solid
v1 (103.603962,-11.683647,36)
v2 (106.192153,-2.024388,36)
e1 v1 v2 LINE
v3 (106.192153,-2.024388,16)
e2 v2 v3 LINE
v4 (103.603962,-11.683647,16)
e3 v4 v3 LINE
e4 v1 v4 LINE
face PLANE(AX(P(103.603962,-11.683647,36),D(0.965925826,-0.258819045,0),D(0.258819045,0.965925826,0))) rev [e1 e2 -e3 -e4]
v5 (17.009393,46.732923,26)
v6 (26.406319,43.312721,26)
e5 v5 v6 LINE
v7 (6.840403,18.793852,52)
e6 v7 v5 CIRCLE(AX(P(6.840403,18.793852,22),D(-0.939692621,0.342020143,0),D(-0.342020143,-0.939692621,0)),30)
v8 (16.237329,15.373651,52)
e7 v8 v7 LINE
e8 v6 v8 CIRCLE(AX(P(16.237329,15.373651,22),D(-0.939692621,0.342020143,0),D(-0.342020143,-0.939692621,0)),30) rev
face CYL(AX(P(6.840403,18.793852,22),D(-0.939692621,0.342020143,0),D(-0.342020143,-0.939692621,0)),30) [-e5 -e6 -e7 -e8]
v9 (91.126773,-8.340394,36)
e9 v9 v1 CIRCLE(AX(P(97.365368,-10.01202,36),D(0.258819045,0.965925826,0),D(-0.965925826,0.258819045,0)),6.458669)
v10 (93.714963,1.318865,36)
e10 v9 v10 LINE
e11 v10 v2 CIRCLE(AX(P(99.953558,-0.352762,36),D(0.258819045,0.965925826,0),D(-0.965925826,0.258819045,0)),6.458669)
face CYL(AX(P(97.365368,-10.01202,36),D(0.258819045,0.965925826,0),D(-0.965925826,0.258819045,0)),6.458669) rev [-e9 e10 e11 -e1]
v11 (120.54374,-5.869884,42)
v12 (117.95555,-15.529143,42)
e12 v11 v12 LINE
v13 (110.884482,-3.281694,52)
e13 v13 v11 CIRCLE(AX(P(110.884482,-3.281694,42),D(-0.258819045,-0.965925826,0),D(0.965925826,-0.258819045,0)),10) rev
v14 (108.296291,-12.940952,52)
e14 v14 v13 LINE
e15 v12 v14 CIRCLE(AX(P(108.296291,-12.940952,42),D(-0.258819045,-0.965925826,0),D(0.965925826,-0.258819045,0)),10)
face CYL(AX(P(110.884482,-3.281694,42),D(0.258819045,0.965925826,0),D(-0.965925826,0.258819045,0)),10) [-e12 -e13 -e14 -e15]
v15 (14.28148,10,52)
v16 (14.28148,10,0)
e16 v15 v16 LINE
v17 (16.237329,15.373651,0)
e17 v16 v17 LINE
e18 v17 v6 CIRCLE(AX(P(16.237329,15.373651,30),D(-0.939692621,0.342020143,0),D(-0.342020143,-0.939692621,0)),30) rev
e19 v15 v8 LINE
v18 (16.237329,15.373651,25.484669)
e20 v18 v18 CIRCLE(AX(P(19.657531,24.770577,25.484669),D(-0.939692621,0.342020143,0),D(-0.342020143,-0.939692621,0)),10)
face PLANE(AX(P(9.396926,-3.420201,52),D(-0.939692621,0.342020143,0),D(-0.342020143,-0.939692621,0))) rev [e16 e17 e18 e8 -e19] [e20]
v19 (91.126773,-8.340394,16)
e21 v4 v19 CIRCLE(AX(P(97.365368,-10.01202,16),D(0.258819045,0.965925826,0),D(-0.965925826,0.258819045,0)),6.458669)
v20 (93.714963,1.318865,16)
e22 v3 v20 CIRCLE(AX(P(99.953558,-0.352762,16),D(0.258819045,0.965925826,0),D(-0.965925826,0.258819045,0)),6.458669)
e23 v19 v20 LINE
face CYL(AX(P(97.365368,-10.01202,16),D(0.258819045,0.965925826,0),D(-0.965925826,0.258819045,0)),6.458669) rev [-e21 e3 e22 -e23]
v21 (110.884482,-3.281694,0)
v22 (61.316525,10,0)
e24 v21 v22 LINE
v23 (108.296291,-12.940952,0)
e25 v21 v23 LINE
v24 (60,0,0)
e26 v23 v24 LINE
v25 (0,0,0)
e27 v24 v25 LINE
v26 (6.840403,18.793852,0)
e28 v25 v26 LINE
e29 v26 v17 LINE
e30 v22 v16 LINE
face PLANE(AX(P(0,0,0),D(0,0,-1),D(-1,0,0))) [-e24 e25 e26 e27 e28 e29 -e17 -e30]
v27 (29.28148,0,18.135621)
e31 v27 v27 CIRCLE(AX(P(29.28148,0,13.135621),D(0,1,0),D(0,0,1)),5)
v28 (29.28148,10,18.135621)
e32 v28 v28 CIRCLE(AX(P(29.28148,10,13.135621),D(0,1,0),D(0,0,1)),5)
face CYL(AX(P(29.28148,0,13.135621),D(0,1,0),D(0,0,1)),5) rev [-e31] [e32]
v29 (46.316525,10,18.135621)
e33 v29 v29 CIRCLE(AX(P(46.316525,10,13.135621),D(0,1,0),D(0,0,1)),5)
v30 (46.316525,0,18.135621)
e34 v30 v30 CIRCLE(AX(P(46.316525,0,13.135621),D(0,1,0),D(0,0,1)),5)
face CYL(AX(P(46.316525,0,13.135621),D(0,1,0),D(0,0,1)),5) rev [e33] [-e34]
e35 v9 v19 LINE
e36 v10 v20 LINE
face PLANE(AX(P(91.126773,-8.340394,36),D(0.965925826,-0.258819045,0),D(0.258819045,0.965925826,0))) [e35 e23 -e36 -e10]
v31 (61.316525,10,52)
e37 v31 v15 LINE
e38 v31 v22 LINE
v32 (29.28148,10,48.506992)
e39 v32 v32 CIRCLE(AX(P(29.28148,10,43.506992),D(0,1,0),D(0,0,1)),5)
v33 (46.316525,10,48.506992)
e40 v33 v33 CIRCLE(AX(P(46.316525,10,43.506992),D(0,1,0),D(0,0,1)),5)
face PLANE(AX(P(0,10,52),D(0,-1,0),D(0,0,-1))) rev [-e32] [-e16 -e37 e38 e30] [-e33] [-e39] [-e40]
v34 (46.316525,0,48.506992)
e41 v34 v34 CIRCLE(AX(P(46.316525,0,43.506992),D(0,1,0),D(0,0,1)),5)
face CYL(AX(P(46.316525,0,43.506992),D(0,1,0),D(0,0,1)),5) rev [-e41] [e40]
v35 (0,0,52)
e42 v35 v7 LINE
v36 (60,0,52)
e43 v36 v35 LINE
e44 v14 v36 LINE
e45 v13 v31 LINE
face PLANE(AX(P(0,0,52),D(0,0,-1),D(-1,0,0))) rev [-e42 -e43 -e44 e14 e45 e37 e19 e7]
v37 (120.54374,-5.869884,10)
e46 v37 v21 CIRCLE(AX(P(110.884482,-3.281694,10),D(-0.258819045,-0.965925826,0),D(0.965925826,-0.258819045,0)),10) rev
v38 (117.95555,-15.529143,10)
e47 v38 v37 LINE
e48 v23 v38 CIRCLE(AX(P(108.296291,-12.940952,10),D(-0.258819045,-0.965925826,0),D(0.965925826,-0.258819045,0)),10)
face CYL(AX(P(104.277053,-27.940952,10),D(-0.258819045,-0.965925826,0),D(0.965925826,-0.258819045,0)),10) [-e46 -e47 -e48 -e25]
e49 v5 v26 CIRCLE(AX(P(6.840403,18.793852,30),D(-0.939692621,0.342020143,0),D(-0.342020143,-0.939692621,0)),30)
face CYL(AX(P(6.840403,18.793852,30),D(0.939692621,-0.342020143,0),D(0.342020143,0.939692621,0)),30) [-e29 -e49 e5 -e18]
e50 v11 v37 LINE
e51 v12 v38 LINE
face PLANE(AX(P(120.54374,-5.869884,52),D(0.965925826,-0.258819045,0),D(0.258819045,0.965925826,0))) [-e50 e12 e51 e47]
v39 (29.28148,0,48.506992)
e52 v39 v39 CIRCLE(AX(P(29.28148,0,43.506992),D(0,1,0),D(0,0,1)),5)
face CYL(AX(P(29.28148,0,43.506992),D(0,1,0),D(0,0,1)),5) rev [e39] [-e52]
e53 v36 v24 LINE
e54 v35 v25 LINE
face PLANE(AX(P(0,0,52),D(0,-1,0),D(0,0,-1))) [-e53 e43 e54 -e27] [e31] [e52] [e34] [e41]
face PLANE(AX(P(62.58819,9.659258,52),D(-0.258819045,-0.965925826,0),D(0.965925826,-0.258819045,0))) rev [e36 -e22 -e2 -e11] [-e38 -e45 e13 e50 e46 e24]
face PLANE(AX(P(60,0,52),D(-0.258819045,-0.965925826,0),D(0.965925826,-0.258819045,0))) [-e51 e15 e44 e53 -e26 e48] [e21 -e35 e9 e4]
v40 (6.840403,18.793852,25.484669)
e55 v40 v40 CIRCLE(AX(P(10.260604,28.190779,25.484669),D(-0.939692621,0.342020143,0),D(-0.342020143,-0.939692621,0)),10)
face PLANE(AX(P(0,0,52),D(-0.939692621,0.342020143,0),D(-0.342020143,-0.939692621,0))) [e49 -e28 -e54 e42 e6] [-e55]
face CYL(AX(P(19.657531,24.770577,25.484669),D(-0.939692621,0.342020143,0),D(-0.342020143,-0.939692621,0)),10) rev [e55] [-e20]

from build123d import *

# Parameters (mm, degrees)
EXTRUDE_THIN1_DEPTH = 52
SKETCH2_R           = 10
CUT_EXTRUDE2_DEPTH  = 10
FILLET1_R           = 30
CUT_EXTRUDE3_DEPTH  = 10
FILLET2_R           = 10
SKETCH4_R           = 5
CUT_EXTRUDE4_DEPTH  = 10


with BuildPart() as part:
    # Sketch1 → Extrude-Thin1 (new body)
    with BuildSketch(Plane.XY):
        Polygon((17.101007166, 46.984631039), (0, 0), (60, 0), (117.955549577, -15.529142706), (120.543740028, -5.869884443), (61.316524976, 10), (14.281480067, 10), (26.497933374, 43.564429606), align=None)
    extrude(amount=EXTRUDE_THIN1_DEPTH)

    # Sketch2 → Cut-Extrude2 (cut)
    with BuildSketch(Plane(origin=(0, 0, 0), x_dir=(0, 0, 1), z_dir=(-0.9396926207859096, 0.34202014332566566, 0))):
        with Locations(Location((25.484668599, 30, 0), (0, 0, 270))):
            Circle(SKETCH2_R)
    extrude(amount=-CUT_EXTRUDE2_DEPTH, mode=Mode.SUBTRACT)

    # Fillet1
    # the kernel refuses this fillet: 30 mm, written as the material it takes off along each edge
    with BuildSketch(Plane(origin=(96.974879933, 17.912918857, 0), x_dir=(0, 0, 1), z_dir=(-0.9396926207859095, 0.34202014332566577, 0))) as fillet1_piece_1_section:
        with BuildLine():
            CenterArc((FILLET1_R, -FILLET1_R), FILLET1_R, 90, 90)
            Line((0, -FILLET1_R), (0, 0))
            Line((0, 0), (FILLET1_R, 0))
        make_face()
    fillet1_piece_1 = extrude(amount=160, mode=Mode.PRIVATE)
    fillet1_piece_1 = split(fillet1_piece_1, bisect_by=Plane(origin=(19.547189191, 10, 6.743574493), z_dir=(0, 1, 0)), keep=Keep.TOP, mode=Mode.PRIVATE)
    add(fillet1_piece_1, mode=Mode.SUBTRACT)
    with BuildSketch(Plane(origin=(96.974879933, 17.912918857, 52), x_dir=(0, 0, -1), z_dir=(-0.9396926207859095, 0.34202014332566577, 0))) as fillet1_piece_2_section:
        with BuildLine():
            CenterArc((FILLET1_R, FILLET1_R), FILLET1_R, 180, 90)
            Line((0, FILLET1_R), (0, 0))
            Line((0, 0), (FILLET1_R, 0))
        make_face()
    fillet1_piece_2 = extrude(amount=160, mode=Mode.PRIVATE)
    fillet1_piece_2 = split(fillet1_piece_2, bisect_by=Plane(origin=(19.547189191, 10, 45.256425507), z_dir=(0, 1, 0)), keep=Keep.TOP, mode=Mode.PRIVATE)
    add(fillet1_piece_2, mode=Mode.SUBTRACT)

    # Sketch3 → Cut-Extrude3 (cut)
    with BuildSketch(Plane(origin=(6.607428337, 24.659258263, 0), x_dir=(0.9659258262890682, -0.25881904510252124, 0), z_dir=(0.25881904510252124, 0.9659258262890682, 0))):
        with BuildLine():
            Line((90.180356015, -36), (90.180356015, -16))
            ThreePointArc((90.180356015, -16), (96.639024601, -9.541331414), (103.097693188, -16))
            Line((103.097693188, -16), (103.097693188, -36))
            ThreePointArc((103.097693188, -36), (96.639024601, -42.458668586), (90.180356015, -36))
        make_face()
    extrude(amount=-CUT_EXTRUDE3_DEPTH, mode=Mode.SUBTRACT)

    # Fillet2
    fillet2_edges = [part.edges().sort_by_distance(p)[0] for p in [
        (119.249644803, -10.699513575, 52),
        (119.249644803, -10.699513575, 0),
    ]]
    fillet(fillet2_edges, radius=FILLET2_R)

    # Sketch4 → Cut-Extrude4 (cut)
    with BuildSketch(Plane(origin=(0, 10, 0), x_dir=(1, 0, 0), z_dir=(0, 1, 0))):
        with Locations(Location((29.281480067, -43.506992199, 0), (0, 0, 270))):
            Circle(SKETCH4_R)
        with Locations(Location((29.281480067, -13.135621251, 0), (0, 0, 270))):
            Circle(SKETCH4_R)
        with Locations(Location((46.316524976, -13.135621251, 0), (0, 0, 270))):
            Circle(SKETCH4_R)
        with Locations(Location((46.316524976, -43.506992199, 0), (0, 0, 270))):
            Circle(SKETCH4_R)
    extrude(amount=-CUT_EXTRUDE4_DEPTH, mode=Mode.SUBTRACT)


solid = part.part
